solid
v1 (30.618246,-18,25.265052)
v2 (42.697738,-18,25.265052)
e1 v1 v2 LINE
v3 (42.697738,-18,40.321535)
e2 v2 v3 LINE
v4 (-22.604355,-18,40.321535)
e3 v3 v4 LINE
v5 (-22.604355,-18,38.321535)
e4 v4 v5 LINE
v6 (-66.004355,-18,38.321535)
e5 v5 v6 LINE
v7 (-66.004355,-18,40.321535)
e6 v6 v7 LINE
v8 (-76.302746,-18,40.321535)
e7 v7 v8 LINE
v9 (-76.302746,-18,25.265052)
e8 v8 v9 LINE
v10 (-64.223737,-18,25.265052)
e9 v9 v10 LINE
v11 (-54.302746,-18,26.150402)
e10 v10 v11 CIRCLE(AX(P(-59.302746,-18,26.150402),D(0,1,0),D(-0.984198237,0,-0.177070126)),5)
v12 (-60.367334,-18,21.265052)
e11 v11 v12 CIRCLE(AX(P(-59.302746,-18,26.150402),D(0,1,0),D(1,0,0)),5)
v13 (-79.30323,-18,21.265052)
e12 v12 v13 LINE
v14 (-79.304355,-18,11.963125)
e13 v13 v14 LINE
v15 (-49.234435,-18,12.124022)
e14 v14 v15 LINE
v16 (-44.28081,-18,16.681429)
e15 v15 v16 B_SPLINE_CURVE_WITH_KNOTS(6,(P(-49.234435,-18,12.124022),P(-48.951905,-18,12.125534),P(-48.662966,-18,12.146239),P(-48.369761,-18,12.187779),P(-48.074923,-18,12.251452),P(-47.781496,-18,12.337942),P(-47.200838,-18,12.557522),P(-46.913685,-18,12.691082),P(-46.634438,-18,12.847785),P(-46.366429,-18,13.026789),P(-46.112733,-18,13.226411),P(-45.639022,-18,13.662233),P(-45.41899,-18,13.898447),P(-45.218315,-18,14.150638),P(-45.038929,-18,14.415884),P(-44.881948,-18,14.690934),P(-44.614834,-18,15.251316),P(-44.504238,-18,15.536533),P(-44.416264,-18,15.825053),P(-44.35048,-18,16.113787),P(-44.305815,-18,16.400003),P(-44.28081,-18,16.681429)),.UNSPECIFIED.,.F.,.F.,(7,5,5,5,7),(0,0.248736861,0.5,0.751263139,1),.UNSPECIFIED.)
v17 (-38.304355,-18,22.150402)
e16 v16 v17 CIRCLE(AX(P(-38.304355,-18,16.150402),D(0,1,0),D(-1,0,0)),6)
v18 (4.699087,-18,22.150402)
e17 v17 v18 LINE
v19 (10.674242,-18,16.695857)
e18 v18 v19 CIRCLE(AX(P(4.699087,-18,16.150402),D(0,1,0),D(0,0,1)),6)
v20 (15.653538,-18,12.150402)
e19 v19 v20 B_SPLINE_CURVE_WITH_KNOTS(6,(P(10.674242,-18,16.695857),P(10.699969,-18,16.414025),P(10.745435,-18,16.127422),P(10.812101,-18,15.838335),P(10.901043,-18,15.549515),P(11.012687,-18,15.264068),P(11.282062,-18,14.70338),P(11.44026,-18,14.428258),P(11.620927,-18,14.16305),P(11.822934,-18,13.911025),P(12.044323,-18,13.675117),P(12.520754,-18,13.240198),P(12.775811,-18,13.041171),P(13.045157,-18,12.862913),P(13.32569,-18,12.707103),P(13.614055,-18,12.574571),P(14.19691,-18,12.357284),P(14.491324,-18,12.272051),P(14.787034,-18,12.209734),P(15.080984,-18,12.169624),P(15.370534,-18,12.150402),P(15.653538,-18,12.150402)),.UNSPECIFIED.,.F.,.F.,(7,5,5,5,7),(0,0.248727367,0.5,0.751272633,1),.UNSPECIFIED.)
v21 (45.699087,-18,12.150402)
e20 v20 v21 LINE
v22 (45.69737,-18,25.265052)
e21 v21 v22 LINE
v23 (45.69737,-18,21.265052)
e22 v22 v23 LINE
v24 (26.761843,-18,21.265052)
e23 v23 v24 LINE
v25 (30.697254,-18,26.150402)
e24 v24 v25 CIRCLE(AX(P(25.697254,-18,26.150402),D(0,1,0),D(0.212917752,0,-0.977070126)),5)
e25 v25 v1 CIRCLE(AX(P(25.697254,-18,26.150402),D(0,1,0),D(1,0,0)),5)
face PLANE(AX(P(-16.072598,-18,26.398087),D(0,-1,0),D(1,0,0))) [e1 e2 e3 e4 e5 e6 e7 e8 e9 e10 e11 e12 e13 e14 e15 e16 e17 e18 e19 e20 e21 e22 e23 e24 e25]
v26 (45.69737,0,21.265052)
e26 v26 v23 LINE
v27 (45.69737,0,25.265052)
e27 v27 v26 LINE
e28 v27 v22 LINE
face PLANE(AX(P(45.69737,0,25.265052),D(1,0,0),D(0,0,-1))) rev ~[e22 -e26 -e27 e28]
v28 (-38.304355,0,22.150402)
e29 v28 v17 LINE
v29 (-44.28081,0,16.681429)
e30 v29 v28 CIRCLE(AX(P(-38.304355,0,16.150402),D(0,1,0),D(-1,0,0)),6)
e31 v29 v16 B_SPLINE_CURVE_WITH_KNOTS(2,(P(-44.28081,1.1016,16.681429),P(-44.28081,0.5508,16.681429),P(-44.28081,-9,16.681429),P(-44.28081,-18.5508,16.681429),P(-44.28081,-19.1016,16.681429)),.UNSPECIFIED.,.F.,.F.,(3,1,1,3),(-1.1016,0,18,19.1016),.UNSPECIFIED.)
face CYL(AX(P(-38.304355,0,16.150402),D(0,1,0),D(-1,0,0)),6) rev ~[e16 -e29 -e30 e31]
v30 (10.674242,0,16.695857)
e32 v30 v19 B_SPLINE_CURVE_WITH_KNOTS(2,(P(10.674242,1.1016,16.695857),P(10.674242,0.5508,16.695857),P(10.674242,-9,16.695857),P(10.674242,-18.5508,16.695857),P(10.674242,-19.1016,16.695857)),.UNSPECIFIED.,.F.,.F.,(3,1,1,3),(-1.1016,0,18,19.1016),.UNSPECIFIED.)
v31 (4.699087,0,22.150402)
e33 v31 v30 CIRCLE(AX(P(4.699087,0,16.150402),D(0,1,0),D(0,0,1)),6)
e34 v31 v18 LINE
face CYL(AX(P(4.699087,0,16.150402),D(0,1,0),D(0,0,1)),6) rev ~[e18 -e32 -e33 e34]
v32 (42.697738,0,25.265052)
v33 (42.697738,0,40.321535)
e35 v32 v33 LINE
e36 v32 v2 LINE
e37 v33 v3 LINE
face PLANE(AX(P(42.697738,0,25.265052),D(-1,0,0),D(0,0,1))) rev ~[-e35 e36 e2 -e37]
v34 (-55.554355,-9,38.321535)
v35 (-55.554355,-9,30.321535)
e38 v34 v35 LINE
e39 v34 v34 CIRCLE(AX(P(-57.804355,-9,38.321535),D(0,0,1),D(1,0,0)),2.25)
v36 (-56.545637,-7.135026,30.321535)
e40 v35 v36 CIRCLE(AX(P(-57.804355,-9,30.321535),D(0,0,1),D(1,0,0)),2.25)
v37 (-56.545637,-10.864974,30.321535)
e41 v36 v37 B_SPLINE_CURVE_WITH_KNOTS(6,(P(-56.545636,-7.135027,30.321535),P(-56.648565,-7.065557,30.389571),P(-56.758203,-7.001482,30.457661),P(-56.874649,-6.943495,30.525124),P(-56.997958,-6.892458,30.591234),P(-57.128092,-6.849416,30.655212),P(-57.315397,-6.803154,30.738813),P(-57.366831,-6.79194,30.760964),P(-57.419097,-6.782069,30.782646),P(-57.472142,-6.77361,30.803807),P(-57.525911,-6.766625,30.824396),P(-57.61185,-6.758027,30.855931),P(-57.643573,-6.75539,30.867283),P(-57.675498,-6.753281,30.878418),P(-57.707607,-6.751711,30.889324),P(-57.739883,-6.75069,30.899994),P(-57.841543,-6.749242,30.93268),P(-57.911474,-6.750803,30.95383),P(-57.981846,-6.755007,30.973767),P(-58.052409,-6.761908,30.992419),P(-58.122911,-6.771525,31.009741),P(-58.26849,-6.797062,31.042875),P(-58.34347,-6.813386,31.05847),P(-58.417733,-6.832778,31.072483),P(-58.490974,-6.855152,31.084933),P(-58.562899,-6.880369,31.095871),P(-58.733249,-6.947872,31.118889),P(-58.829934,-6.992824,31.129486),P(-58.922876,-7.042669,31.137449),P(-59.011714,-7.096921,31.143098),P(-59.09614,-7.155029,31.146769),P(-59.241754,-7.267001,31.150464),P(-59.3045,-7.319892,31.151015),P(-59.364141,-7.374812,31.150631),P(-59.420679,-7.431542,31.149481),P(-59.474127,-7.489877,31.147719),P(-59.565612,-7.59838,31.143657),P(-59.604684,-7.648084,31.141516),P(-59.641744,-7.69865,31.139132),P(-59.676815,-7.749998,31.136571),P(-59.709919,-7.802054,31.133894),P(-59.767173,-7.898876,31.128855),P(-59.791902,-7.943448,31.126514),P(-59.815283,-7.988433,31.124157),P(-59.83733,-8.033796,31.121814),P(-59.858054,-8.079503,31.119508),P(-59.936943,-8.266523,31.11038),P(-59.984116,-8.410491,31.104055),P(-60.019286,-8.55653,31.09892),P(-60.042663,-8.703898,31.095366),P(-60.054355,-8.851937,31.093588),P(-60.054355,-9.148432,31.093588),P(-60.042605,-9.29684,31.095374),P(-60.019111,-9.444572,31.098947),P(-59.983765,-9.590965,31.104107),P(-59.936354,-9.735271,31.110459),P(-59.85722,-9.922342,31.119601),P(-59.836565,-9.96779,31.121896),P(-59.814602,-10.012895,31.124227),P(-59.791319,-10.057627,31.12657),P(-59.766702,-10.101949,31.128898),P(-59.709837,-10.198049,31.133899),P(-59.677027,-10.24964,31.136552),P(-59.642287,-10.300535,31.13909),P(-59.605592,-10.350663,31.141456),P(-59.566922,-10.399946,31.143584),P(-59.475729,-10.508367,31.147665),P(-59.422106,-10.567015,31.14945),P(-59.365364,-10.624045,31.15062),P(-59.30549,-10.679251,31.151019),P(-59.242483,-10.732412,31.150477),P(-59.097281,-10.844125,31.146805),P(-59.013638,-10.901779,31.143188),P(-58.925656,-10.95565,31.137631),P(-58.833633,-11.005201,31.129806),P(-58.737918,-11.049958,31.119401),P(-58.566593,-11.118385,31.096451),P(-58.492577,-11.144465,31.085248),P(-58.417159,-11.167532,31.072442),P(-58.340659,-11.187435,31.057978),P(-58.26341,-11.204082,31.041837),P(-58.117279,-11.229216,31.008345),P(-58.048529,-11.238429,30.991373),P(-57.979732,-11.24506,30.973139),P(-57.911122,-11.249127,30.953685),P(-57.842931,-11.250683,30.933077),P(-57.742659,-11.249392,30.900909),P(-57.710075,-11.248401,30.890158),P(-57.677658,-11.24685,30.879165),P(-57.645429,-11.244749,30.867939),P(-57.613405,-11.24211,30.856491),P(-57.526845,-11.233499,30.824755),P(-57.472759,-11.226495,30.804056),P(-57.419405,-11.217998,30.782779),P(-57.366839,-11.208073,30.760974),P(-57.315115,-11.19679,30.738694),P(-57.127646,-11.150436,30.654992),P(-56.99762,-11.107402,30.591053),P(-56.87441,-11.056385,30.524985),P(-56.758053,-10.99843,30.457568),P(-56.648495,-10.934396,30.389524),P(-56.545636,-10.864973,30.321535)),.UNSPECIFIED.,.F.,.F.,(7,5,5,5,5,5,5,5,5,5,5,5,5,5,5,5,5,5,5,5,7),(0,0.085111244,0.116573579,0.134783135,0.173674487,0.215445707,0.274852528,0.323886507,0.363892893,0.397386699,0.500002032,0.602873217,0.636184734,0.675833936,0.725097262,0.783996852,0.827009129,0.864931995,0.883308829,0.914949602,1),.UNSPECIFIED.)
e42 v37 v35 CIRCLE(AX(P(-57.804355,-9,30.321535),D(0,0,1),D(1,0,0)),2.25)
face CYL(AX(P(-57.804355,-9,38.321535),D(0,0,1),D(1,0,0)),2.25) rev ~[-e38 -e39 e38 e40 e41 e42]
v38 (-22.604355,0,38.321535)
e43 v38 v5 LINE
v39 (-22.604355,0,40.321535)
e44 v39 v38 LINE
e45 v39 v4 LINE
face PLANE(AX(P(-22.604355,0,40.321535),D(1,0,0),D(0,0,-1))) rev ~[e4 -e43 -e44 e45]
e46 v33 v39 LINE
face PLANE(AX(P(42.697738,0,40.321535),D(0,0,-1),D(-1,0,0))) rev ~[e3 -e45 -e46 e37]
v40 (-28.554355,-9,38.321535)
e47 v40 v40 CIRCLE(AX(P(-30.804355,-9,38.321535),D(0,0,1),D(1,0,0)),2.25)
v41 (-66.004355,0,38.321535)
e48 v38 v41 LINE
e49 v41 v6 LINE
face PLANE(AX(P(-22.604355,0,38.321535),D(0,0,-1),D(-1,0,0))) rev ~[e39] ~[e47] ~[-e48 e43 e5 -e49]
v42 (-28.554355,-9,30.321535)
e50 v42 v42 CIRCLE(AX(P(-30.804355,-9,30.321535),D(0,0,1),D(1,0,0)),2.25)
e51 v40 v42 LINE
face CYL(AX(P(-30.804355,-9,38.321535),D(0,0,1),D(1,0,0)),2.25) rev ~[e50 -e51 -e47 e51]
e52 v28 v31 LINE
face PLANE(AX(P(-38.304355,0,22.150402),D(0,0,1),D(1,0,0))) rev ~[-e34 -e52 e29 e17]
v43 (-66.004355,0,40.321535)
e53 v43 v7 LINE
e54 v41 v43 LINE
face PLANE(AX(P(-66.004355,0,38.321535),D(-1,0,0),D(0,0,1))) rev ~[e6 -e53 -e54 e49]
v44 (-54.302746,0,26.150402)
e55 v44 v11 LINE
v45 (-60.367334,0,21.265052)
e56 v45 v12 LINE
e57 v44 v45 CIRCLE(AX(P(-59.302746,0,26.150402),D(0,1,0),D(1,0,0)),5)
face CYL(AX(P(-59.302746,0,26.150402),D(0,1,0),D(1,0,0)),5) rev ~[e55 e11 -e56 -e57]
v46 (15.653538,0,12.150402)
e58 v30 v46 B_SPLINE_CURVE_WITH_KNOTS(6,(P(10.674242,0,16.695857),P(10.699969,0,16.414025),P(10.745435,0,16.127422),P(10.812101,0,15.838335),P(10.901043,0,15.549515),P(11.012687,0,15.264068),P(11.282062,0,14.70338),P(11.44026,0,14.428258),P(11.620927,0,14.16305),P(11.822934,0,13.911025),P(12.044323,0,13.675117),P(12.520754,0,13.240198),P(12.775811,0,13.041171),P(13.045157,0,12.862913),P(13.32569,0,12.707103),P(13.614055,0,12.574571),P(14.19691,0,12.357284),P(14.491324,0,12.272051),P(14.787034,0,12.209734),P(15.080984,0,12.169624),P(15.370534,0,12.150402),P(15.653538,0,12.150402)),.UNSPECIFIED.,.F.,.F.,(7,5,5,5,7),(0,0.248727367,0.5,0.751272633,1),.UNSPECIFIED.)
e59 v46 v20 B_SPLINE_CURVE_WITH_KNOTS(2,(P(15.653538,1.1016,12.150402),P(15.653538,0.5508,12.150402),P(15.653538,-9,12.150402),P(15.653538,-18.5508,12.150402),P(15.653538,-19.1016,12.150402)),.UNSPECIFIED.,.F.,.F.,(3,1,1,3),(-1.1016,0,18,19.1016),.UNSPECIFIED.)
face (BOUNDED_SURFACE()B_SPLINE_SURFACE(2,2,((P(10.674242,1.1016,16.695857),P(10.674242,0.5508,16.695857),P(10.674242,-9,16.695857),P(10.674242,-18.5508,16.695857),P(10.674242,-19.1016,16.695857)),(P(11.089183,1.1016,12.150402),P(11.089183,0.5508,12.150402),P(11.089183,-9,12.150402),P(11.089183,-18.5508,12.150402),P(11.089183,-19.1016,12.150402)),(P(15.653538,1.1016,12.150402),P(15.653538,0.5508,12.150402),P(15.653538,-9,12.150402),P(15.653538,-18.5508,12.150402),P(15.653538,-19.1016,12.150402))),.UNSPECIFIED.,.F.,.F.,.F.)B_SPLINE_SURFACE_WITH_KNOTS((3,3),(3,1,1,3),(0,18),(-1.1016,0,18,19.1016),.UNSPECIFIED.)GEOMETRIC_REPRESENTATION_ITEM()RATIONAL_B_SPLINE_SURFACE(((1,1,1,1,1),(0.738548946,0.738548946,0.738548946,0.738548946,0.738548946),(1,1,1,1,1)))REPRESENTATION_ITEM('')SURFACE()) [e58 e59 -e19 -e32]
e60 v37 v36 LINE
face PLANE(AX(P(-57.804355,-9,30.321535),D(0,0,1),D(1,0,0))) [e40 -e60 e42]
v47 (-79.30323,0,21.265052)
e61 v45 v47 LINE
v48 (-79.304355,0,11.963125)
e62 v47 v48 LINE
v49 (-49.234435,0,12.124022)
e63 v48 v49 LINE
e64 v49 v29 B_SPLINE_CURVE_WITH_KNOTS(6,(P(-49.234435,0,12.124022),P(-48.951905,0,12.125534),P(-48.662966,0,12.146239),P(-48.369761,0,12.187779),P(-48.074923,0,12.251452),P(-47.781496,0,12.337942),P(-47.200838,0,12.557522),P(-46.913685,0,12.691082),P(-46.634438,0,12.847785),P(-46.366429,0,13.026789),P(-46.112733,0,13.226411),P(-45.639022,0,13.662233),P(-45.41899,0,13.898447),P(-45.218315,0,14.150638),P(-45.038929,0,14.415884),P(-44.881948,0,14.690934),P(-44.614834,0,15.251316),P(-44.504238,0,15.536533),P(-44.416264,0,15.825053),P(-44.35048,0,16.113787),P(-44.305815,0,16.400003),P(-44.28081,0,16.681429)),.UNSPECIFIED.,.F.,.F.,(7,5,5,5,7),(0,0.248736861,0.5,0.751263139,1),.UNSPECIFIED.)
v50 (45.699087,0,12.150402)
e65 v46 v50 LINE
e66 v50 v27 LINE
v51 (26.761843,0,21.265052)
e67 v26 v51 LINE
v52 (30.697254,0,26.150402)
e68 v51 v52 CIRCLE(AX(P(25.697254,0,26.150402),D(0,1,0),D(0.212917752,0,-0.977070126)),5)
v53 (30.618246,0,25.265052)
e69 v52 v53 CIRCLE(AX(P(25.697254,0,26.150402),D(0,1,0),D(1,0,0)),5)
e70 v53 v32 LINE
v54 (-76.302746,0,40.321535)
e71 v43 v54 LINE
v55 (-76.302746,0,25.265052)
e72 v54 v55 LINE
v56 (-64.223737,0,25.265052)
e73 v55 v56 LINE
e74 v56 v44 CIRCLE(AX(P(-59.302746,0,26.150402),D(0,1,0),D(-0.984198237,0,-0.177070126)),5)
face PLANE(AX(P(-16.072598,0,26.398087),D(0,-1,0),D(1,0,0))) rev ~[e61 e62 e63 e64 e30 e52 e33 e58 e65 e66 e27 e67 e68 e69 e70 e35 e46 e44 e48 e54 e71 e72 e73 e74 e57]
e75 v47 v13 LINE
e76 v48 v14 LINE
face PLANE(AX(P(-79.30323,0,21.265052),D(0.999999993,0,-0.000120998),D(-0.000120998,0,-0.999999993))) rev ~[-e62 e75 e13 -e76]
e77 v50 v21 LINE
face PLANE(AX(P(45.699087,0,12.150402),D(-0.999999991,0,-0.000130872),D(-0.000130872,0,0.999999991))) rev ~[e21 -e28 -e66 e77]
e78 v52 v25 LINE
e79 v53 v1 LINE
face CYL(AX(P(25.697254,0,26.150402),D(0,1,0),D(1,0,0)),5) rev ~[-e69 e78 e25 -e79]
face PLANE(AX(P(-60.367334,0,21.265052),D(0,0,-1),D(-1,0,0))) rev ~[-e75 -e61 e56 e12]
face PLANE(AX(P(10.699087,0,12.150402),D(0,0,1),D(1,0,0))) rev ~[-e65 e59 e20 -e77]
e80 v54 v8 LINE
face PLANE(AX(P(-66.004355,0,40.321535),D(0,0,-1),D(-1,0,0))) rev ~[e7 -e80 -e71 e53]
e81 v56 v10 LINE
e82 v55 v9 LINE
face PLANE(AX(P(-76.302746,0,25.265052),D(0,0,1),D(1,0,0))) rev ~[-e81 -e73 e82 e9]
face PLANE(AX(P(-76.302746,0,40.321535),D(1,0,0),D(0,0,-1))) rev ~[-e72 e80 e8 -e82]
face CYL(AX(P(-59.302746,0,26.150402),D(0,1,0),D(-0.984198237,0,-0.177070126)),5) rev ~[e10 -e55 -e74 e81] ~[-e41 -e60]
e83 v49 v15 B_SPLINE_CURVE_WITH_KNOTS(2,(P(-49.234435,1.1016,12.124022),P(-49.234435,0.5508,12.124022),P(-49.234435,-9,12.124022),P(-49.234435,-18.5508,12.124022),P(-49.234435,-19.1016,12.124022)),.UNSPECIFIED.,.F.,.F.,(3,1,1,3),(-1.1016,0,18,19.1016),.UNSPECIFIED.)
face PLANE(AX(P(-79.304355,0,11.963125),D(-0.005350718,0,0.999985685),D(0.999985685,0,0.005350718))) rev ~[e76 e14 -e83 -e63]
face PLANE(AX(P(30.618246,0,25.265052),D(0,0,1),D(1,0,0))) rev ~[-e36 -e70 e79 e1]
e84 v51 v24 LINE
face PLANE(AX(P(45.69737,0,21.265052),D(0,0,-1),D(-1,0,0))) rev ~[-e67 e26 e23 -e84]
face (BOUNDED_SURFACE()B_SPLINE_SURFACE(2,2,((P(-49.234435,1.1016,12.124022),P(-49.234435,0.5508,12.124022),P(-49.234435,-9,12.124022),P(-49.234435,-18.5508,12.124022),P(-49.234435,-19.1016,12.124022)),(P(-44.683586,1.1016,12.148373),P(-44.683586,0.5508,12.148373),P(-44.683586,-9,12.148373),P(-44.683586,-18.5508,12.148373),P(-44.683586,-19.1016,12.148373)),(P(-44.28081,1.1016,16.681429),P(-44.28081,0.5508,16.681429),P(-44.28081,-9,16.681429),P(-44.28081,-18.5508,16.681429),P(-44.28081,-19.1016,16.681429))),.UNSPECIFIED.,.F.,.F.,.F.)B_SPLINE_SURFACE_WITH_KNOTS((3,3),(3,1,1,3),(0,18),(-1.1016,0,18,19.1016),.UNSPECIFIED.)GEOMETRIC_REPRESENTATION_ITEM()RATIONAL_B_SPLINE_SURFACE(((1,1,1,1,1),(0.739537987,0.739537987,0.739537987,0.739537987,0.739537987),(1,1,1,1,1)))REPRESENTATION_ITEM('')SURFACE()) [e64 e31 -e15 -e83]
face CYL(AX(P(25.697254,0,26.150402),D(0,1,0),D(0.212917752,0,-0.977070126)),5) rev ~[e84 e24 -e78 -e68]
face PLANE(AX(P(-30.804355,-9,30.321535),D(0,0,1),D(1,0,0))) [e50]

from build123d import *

# Parameters (mm, degrees)
F1_DEPTH = 18
F2_R     = 5
F3_R     = 2.25
F4_DEPTH = 8


# Not quite as in the source:
# - a feature names something its author has since deleted; it is built from what else it names


with BuildPart() as f1:
    # F0 (on Front) → F1 (new body)
    with BuildSketch(Plane.XZ):
        with BuildLine():
            ThreePointArc((-64.2237368111, 25.2650516673), (-59.7471801328, 31.1306109239), (-54.3027456241, 26.150402297))
            ThreePointArc((-54.3027456241, 26.150402297), (-56.1661028164, 22.2566288192), (-60.3673343828, 21.2650516673))
            Line((-60.3673343828, 21.2650516673), (-79.3032296173, 21.2650516673))
            Line((-79.3032296173, 21.2650516673), (-79.3043551346, 11.9631245031))
            Line((-79.3043551346, 11.9631245031), (-44.3043551346, 12.150402297))
            Line((-44.3043551346, 12.150402297), (-44.3043551346, 16.150402297))
            ThreePointArc((-44.3043551346, 16.150402297), (-42.5469958217, 20.3930429841), (-38.3043551346, 22.150402297))
            Line((-38.3043551346, 22.150402297), (4.6990865829, 22.150402297))
            ThreePointArc((4.6990865829, 22.150402297), (8.94172727, 20.3930429841), (10.6990865829, 16.150402297))
            Line((10.6990865829, 16.150402297), (10.6990865829, 12.150402297))
            Line((10.6990865829, 12.150402297), (45.6990865829, 12.150402297))
            Line((45.6990865829, 12.150402297), (45.6973702434, 25.2650516673))
            Line((45.6973702434, 25.2650516673), (45.6973702434, 21.2650516673))
            Line((45.6973702434, 21.2650516673), (42.6977375527, 21.2650516673))
            Line((42.6977375527, 21.2650516673), (26.7618431345, 21.2650516673))
            ThreePointArc((26.7618431345, 21.2650516673), (21.803480898, 29.2870451047), (30.6972543759, 26.150402297))
            ThreePointArc((30.6972543759, 26.150402297), (30.6774630028, 25.7059677883), (30.6182455629, 25.2650516673))
            Line((30.6182455629, 25.2650516673), (42.6977375527, 25.2650516673))
            Line((42.6977375527, 25.2650516673), (42.6977375527, 40.3215353384))
            Line((42.6977375527, 40.3215353384), (34.3958526514, 40.3215353384))
            Line((34.3958526514, 40.3215353384), (9.5622779218, 40.3215353384))
            Line((9.5622779218, 40.3215353384), (-22.6043551346, 40.3215353384))
            Line((-22.6043551346, 40.3215353384), (-22.6043551346, 38.3215353384))
            Line((-22.6043551346, 38.3215353384), (-44.3043551346, 38.3215353384))
            Line((-44.3043551346, 38.3215353384), (-66.0043551346, 38.3215353384))
            Line((-66.0043551346, 38.3215353384), (-66.0043551346, 40.3215353384))
            Line((-66.0043551346, 40.3215353384), (-76.3027456241, 40.3215353384))
            Line((-76.3027456241, 40.3215353384), (-76.3027456241, 25.2650516673))
            Line((-76.3027456241, 25.2650516673), (-64.2237368111, 25.2650516673))
        make_face()
    extrude(amount=F1_DEPTH)

    # F2
    f2_edges = [f1.edges().sort_by_distance(p)[0] for p in [
        (-44.304355, -9, 12.150402),
        (10.699087, -9, 12.150402),
    ]]
    fillet(f2_edges, radius=F2_R)

    # F3 (on face) → F4 (cut)
    with BuildSketch(Plane.XY.offset(38.3215353384)):
        with Locations((-30.8043551346, -9)):
            Circle(F3_R)
        with Locations((-57.8043551346, -9)):
            Circle(F3_R)
    extrude(amount=-F4_DEPTH, mode=Mode.SUBTRACT)


solid = f1.part
